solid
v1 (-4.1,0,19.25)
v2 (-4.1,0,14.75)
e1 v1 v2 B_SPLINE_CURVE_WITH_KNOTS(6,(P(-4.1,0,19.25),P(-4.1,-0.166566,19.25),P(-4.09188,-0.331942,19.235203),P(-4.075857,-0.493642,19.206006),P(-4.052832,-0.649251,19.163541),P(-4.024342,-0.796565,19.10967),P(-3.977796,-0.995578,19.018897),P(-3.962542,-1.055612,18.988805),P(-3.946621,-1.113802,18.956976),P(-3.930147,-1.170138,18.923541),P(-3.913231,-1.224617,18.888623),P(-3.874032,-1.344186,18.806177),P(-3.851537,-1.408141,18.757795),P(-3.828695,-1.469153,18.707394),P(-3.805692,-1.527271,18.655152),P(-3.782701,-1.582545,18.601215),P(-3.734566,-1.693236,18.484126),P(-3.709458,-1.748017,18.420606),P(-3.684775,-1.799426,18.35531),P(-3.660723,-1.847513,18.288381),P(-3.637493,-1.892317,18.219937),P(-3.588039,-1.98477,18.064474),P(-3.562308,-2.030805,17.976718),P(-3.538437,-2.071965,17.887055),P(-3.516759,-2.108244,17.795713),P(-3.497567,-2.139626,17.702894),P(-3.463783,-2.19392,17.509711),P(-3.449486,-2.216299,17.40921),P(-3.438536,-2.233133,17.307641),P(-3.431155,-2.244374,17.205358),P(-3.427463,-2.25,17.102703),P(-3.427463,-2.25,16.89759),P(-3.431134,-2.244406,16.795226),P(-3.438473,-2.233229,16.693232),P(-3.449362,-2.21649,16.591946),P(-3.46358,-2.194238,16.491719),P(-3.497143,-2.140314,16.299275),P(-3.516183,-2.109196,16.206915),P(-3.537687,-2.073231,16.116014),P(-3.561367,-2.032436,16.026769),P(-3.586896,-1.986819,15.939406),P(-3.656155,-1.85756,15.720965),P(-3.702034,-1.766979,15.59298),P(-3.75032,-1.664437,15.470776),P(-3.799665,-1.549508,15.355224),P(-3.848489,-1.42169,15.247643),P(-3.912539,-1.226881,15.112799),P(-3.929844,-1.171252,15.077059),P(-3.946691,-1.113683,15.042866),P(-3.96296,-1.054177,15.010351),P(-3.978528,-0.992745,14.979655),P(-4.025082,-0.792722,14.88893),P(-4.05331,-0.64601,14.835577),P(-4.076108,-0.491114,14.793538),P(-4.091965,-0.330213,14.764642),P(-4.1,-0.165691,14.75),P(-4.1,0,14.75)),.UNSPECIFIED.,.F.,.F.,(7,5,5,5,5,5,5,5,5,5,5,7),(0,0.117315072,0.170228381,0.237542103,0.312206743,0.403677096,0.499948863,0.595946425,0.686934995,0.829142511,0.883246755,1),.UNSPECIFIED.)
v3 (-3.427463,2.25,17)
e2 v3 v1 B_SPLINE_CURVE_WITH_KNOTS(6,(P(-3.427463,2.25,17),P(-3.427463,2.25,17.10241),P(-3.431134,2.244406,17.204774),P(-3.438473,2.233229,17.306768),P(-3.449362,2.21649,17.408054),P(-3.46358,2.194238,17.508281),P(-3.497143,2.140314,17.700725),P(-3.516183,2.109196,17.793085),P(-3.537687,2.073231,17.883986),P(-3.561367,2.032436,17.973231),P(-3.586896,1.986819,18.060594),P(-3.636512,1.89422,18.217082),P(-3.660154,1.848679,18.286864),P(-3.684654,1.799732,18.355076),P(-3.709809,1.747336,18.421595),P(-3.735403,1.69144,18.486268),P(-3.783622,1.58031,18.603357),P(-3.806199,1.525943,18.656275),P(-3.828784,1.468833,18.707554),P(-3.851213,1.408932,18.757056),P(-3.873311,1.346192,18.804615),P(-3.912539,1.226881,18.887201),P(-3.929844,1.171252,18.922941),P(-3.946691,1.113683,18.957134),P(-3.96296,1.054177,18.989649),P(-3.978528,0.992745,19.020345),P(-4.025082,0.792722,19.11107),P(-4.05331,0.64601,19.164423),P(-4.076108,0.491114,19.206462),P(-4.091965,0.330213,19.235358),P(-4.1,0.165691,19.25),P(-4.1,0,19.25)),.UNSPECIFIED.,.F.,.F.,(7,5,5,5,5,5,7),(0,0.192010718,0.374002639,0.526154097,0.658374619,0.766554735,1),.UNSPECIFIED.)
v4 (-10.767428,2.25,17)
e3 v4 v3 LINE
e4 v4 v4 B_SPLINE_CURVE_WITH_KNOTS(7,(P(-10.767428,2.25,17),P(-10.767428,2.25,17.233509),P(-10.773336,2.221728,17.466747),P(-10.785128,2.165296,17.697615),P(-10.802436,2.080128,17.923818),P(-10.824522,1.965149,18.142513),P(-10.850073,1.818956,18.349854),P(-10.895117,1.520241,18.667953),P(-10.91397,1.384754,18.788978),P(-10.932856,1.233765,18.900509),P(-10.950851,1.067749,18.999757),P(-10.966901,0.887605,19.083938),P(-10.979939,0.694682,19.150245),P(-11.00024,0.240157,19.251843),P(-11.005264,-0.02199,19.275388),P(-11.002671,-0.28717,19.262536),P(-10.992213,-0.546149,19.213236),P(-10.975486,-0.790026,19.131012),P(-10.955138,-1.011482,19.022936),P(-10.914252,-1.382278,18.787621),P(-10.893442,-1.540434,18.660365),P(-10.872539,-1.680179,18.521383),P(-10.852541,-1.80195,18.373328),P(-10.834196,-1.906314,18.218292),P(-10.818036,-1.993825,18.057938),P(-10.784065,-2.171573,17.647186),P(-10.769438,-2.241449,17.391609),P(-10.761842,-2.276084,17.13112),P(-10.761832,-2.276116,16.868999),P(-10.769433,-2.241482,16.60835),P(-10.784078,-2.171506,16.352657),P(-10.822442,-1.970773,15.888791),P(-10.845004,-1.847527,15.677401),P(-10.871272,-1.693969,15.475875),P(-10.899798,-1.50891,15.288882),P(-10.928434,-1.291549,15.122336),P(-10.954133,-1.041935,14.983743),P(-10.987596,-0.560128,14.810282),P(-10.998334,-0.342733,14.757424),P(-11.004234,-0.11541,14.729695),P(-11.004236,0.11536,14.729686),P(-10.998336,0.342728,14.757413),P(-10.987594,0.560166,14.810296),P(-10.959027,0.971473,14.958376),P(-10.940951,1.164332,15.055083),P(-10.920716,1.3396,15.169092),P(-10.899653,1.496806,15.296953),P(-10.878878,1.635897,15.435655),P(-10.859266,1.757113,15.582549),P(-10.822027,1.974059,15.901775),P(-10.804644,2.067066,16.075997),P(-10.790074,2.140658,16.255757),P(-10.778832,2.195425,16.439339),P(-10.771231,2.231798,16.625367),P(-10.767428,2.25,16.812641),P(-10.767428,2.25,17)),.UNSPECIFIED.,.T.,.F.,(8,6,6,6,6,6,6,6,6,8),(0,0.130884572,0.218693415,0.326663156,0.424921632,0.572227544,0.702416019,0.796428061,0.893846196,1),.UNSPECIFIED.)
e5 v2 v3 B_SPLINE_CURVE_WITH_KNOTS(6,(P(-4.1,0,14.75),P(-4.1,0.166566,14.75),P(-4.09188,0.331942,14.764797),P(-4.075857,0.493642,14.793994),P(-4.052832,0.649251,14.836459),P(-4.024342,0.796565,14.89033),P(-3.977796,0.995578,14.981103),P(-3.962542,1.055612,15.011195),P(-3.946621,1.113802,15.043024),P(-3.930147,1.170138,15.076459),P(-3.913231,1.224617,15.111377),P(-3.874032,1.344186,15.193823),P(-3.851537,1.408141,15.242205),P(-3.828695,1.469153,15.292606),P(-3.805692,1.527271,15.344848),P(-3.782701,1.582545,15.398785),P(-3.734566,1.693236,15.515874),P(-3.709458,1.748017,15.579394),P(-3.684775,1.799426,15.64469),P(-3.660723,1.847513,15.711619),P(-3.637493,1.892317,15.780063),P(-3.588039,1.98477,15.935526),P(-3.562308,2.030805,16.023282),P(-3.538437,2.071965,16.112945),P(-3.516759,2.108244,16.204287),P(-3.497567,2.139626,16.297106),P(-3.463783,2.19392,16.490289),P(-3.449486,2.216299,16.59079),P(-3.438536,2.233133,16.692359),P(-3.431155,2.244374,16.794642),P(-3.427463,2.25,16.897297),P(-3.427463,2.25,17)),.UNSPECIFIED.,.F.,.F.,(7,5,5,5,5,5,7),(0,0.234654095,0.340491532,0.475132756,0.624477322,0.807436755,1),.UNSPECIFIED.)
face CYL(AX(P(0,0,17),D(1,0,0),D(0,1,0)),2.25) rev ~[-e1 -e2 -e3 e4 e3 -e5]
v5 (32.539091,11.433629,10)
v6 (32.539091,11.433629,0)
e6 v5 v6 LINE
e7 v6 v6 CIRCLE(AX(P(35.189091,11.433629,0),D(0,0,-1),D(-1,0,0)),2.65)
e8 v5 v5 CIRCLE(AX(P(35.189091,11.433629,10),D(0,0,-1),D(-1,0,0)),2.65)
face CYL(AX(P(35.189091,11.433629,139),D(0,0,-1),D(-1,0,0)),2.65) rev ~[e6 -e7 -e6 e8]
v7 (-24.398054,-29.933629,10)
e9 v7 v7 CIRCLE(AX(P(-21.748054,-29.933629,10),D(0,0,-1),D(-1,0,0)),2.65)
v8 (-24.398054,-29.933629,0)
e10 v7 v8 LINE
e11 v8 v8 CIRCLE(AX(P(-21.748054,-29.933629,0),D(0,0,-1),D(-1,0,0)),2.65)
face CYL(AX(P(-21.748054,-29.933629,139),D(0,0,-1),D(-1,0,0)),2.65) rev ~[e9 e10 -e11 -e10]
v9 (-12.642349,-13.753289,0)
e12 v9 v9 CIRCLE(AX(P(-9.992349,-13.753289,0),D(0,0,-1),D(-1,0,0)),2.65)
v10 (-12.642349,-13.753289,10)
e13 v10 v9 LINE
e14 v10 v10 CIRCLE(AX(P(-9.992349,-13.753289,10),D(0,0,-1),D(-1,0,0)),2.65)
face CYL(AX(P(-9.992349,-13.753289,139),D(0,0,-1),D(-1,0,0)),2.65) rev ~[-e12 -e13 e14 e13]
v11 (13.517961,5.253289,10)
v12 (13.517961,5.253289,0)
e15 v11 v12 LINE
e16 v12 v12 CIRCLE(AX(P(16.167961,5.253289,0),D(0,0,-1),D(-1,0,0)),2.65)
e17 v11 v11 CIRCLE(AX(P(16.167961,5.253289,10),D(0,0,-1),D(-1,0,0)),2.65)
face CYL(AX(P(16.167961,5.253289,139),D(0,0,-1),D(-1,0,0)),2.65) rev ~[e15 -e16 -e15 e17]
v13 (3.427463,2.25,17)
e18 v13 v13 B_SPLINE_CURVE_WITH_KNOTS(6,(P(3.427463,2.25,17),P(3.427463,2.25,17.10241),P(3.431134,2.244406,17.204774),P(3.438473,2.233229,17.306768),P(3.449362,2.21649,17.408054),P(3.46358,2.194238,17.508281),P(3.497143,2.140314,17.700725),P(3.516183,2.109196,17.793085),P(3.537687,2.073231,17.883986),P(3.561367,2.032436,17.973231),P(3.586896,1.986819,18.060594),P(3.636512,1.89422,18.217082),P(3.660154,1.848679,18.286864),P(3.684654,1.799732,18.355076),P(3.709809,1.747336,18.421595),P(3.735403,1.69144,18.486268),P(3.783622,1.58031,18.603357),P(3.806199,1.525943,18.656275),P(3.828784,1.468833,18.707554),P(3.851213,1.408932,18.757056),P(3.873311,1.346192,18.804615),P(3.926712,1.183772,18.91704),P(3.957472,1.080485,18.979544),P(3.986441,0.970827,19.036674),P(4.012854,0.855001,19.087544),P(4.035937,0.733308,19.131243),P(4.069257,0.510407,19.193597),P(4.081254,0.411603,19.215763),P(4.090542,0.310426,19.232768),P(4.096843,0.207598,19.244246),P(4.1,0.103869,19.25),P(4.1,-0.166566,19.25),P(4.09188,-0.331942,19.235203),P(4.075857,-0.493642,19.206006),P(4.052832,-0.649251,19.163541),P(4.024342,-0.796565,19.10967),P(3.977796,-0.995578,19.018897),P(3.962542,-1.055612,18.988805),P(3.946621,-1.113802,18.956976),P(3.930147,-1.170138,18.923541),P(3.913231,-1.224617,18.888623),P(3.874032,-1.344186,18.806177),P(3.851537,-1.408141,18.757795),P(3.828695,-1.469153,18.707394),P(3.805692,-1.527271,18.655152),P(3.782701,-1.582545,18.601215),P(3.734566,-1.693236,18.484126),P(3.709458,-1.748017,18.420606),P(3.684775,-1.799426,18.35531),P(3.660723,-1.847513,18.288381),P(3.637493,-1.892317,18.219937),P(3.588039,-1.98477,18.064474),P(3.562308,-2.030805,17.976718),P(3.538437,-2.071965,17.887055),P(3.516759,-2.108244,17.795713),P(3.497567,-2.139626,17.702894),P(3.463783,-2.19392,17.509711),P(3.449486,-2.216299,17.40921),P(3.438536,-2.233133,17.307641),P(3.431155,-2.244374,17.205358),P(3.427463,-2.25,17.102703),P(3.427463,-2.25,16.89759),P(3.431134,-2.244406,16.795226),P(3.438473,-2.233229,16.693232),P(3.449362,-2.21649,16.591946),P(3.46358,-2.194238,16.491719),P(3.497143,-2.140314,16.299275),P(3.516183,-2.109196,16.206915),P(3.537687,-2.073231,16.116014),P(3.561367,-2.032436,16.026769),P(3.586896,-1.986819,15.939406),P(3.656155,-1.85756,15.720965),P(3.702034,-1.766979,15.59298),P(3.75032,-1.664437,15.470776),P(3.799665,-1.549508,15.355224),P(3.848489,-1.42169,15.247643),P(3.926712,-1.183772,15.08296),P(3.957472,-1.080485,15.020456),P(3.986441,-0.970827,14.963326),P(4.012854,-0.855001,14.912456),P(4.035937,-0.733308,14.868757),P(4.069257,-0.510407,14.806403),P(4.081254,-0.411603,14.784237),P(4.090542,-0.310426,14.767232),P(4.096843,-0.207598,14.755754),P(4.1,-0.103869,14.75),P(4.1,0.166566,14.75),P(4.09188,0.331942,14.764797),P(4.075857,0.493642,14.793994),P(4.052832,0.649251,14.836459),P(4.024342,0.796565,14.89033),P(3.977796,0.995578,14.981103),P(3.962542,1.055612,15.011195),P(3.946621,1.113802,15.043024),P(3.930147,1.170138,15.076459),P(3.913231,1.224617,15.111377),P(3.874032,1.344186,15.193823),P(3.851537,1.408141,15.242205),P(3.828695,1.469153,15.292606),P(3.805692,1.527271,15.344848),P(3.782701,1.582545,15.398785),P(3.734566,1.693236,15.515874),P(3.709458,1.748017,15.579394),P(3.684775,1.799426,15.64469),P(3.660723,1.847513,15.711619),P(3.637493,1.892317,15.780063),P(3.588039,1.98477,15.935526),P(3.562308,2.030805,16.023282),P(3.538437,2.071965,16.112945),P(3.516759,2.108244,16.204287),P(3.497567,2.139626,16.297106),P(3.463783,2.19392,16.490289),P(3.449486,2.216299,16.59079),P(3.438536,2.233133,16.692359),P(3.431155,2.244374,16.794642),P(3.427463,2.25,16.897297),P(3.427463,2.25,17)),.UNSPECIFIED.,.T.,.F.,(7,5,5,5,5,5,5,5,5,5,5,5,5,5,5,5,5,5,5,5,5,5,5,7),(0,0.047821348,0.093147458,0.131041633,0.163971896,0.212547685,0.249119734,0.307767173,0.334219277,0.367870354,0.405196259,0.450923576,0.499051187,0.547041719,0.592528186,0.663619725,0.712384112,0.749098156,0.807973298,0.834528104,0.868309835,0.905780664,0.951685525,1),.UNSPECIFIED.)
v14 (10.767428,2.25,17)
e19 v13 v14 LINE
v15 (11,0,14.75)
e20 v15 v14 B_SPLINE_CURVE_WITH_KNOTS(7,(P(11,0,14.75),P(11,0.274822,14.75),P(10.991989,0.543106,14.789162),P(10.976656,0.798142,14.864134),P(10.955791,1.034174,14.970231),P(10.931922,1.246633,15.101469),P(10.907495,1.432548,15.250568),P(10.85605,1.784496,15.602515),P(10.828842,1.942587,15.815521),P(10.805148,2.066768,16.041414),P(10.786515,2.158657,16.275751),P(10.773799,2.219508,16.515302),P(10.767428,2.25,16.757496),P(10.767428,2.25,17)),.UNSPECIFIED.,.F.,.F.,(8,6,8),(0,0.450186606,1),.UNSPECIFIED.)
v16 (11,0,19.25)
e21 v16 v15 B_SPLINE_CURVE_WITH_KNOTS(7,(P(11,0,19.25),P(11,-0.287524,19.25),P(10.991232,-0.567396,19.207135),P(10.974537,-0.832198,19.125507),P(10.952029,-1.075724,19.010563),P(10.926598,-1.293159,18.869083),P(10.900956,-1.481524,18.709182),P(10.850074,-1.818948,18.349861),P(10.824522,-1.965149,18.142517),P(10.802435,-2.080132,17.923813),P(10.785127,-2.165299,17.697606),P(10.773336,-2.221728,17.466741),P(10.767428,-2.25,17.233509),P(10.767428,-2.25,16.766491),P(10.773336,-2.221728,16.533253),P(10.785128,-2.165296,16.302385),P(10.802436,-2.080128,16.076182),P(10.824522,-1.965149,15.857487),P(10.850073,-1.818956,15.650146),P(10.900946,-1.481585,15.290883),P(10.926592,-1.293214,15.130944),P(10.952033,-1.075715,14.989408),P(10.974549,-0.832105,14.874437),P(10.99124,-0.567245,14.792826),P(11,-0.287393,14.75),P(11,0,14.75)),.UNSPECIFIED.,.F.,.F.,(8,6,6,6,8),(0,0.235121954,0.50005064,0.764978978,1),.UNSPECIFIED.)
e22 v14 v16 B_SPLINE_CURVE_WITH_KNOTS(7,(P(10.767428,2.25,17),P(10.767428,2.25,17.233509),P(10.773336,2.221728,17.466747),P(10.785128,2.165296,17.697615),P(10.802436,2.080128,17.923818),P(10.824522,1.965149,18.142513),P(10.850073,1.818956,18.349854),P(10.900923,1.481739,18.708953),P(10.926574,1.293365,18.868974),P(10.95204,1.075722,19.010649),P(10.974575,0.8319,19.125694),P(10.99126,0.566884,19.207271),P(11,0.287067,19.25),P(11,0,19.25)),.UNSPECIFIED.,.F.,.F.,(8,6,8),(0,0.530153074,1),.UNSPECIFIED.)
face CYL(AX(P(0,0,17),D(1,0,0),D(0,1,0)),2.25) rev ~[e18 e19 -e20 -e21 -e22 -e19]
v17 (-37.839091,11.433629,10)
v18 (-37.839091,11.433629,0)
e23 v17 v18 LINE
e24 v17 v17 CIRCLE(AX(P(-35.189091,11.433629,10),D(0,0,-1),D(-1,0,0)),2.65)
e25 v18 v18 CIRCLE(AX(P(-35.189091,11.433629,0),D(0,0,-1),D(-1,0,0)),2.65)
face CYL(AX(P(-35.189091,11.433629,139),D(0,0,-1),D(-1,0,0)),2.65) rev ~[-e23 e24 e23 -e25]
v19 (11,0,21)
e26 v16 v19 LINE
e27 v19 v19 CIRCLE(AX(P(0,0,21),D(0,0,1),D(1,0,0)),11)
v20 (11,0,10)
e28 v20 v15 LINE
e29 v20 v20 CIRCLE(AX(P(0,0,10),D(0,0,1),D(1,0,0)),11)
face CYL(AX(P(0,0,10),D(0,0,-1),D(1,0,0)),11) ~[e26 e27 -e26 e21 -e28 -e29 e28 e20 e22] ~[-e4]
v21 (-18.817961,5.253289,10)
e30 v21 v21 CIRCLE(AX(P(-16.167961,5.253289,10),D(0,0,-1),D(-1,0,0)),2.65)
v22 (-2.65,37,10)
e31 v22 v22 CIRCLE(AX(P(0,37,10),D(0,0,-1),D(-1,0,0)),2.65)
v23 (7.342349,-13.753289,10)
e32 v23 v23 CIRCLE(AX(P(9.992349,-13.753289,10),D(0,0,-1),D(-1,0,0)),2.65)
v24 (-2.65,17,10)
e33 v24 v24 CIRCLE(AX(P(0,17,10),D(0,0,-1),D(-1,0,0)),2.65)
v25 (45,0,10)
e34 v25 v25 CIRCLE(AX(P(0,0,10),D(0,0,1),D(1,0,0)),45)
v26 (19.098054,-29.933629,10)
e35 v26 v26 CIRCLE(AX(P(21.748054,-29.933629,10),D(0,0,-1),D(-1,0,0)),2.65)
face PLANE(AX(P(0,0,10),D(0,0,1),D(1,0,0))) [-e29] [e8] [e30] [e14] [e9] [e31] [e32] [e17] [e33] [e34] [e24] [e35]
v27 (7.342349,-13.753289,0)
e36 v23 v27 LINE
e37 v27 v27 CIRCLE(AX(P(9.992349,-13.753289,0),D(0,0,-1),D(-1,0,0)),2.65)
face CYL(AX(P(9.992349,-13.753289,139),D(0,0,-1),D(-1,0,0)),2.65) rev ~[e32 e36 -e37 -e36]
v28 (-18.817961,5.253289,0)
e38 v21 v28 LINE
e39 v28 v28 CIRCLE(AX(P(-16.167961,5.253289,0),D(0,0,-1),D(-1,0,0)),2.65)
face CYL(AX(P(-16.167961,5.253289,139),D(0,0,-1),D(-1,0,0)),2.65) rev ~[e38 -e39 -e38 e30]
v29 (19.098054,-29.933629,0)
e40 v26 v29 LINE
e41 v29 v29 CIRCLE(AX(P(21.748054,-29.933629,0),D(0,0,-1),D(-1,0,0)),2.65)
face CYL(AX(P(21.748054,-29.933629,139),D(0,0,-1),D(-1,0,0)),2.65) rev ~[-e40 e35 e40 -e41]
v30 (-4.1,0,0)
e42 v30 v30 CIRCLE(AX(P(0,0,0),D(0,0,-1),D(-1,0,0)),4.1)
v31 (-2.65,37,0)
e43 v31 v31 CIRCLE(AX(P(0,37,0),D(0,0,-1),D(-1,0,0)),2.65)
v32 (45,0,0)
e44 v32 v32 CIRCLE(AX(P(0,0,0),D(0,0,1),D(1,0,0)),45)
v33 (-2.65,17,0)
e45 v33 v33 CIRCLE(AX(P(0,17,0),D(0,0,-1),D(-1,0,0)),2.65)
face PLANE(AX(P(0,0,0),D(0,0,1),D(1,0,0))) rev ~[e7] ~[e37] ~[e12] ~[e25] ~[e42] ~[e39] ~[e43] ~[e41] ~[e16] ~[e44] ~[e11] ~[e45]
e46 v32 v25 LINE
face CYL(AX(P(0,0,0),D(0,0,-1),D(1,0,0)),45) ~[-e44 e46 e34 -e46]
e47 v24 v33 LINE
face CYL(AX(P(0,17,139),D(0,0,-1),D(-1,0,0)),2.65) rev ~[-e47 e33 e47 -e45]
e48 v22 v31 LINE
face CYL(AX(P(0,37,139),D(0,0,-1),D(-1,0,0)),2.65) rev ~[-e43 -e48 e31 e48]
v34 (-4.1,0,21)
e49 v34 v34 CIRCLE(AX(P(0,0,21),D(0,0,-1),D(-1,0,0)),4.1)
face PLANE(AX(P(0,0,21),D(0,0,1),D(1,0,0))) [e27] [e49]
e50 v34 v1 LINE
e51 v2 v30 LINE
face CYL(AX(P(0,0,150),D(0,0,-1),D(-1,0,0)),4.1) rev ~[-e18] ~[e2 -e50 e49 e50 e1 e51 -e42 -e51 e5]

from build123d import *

# Parameters (mm, degrees)
F0_R     = 45
F1_DEPTH = 10
F2_R     = 11
F3_DEPTH = 11
F5_D     = 8.2
F7_D     = 5.3
F8_R     = 2.25
F9_DEPTH = 50


# Not quite as in the source:
# - a feature names something its author has since deleted; it is built from what else it names


with BuildPart() as f1:
    # F0 (on Top) → F1 (new body)
    with BuildSketch(Plane.XY):
        Circle(F0_R)
    extrude(amount=F1_DEPTH)

    # F2 (on face) → F3 (join)
    with BuildSketch(Plane.XY.offset(10)):
        Circle(F2_R)
    extrude(amount=F3_DEPTH)

    # F5 (through all)
    with Locations(Plane.XY.offset(21)):
        with Locations((0, 0)):
            Hole(F5_D / 2)

    # F7 (through all)
    with Locations(Plane.XY.offset(10)):
        with Locations((0, 17), (16.167960777, 5.2532889044), (9.992349289, -13.7532889044), (-9.992349289, -13.7532889044), (-16.167960777, 5.2532889044), (35.1890911029, 11.4336287919), (21.7480543348, -29.9336287919), (-21.7480543348, -29.9336287919), (-35.1890911029, 11.4336287919), (0, 37)):
            Hole(F7_D / 2)

    # F8 (on Right) → F9 (cut, symmetric)
    with BuildSketch(Plane.YZ):
        with Locations((0, 17)):
            Circle(F8_R)
    extrude(amount=F9_DEPTH, both=True, mode=Mode.SUBTRACT)


solid = f1.part
